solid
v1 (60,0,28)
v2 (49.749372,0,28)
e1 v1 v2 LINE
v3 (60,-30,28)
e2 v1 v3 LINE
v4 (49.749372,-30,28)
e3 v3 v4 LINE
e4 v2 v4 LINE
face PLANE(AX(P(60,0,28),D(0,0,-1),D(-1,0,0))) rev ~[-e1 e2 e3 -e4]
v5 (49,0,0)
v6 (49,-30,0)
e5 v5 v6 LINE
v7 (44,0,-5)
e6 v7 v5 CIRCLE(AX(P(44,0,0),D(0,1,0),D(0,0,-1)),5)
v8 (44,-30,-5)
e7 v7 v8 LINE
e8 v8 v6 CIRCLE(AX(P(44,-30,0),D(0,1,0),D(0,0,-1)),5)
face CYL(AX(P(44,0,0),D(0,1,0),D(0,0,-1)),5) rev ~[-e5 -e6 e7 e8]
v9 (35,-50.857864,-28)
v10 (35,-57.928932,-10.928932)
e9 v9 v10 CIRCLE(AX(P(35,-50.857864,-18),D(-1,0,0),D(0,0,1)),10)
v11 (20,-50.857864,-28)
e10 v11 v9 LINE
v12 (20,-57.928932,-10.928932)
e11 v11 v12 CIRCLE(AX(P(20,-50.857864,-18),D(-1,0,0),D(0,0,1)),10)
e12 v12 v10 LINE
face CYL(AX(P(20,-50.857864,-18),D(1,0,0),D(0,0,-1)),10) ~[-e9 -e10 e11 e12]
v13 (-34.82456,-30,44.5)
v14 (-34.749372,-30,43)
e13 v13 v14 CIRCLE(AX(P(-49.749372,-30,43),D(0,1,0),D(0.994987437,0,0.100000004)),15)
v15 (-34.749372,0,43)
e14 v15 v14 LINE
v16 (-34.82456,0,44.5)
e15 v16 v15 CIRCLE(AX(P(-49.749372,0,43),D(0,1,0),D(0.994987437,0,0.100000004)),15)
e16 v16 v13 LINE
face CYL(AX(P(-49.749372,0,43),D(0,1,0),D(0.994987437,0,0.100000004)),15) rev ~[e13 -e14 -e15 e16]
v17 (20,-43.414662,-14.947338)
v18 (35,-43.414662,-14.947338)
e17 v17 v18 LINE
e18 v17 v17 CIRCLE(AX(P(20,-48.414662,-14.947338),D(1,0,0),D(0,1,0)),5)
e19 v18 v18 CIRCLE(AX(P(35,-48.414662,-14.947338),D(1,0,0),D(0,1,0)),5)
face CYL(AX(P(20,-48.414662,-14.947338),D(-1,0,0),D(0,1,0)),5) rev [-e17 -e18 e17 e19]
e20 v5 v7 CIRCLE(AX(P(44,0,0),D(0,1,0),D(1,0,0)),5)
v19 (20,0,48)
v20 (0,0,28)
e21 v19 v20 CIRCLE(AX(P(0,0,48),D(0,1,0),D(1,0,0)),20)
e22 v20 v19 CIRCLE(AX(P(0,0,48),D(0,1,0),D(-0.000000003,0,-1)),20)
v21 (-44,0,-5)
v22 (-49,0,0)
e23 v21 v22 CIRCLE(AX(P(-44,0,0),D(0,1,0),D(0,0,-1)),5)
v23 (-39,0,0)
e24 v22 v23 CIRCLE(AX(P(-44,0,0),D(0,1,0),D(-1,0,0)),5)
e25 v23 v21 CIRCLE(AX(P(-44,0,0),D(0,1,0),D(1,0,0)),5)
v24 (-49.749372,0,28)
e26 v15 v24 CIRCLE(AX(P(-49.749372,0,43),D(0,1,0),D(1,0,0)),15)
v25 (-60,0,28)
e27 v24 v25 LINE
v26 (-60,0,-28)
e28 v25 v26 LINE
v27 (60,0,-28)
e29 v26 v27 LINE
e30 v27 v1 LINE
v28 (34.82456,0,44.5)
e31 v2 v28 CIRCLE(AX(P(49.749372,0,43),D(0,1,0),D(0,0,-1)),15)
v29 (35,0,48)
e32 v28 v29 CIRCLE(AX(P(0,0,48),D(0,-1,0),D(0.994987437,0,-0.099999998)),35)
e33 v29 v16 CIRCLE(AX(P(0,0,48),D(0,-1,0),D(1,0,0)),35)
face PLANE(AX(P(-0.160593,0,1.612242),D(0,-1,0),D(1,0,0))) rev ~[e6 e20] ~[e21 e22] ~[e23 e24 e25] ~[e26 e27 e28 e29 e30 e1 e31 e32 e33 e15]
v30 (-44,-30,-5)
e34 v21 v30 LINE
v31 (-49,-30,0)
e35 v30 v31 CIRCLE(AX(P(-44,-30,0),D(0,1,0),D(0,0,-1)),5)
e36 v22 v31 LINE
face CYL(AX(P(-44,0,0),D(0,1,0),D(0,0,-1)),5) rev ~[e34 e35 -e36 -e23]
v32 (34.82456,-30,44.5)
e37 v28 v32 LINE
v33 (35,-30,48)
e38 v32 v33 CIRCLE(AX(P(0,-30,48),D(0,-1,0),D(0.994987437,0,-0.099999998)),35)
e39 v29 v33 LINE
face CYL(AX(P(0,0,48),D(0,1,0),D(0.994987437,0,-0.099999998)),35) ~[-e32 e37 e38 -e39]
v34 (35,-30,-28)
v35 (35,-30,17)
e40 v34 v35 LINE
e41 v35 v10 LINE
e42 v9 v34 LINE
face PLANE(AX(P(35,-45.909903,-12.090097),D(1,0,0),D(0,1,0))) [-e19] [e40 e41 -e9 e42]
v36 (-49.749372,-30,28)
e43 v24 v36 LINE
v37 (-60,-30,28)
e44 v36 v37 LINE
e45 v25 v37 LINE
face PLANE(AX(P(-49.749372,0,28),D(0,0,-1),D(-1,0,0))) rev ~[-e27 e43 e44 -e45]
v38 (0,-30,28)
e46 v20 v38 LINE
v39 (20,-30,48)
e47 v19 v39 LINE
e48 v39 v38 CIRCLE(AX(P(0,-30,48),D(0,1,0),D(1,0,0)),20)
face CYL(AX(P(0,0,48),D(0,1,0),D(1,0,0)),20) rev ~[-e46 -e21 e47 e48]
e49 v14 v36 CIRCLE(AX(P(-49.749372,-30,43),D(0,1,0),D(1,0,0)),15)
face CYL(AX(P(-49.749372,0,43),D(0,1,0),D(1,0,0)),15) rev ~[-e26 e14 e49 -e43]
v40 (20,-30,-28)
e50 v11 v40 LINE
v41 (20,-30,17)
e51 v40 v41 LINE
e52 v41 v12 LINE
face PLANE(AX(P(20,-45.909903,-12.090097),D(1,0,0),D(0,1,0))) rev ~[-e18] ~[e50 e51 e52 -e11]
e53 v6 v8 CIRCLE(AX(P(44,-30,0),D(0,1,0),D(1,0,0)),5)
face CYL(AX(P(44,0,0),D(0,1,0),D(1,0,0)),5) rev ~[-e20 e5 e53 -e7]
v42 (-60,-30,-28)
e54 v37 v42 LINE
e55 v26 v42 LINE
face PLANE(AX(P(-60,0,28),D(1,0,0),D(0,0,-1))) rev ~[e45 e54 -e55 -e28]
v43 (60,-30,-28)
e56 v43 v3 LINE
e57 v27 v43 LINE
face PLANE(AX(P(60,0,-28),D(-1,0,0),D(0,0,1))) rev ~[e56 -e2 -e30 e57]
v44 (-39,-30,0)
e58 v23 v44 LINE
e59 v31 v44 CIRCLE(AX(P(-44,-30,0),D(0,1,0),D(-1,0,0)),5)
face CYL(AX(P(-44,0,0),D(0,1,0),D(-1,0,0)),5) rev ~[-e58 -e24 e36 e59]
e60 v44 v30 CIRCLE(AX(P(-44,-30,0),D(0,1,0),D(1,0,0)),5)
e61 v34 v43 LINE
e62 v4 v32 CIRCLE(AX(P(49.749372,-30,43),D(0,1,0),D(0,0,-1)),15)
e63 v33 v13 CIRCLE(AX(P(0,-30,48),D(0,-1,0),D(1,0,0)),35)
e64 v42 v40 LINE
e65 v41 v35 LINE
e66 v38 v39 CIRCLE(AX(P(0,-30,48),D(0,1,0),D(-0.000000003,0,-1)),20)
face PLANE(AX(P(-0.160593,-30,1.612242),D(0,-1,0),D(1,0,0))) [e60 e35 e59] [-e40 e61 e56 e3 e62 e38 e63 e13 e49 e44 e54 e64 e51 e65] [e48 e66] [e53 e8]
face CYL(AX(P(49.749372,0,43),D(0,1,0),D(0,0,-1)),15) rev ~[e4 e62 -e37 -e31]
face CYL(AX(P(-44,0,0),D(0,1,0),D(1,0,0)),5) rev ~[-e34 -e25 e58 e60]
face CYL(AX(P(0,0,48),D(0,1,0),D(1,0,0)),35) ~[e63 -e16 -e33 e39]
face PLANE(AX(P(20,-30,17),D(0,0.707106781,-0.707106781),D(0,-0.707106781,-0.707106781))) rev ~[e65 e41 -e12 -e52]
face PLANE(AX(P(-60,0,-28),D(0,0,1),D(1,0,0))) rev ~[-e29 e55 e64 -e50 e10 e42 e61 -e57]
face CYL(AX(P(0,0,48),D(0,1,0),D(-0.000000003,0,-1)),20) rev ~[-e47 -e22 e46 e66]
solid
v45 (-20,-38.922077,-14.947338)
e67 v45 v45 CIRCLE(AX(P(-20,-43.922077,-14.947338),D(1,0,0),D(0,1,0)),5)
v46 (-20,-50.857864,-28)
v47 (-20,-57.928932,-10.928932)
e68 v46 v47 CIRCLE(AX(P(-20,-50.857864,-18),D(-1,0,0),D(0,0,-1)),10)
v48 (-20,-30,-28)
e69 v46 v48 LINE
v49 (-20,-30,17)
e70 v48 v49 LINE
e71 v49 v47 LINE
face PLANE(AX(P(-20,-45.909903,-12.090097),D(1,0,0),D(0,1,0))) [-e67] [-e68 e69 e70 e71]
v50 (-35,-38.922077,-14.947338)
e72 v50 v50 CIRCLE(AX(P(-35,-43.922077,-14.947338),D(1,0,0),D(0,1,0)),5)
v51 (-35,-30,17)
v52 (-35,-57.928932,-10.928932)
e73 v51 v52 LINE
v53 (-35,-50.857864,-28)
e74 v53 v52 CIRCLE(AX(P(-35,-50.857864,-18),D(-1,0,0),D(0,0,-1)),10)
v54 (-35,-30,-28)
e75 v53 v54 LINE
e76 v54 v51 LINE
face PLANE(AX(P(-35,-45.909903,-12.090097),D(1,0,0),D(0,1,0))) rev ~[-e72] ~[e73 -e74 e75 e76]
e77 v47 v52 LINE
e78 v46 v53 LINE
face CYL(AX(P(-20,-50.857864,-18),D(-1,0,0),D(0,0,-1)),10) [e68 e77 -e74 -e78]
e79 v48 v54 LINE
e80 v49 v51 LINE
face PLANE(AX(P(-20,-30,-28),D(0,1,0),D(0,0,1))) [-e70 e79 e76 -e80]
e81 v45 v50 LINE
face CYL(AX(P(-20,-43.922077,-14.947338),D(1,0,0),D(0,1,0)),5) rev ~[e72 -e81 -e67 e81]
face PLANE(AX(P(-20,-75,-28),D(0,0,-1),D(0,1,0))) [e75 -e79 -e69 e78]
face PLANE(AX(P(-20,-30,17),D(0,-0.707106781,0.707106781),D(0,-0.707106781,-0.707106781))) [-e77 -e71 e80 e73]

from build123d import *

# Parameters (mm, degrees)
F1_DEPTH = 30
F3_R     = 5
F4_DEPTH = 15
F5_R     = 10
F7_R     = 5
F8_DEPTH = 15
F9_R     = 10


# Not quite as in the source:
# - a feature names something its author has since deleted; it is built from what else it names


with BuildPart() as f1:
    # F0 (on Front) → F1 (new body)
    with BuildSketch(Plane.XZ):
        with BuildLine():
            Line((60, 0), (60, 28))
            Line((60, 28), (49.7493718553, 28))
            Line((49.7493718553, 28), (28.7228132327, 28))
            ThreePointArc((28.7228132327, 28), (0, 13), (-28.7228132327, 28))
            Line((-28.7228132327, 28), (-49.7493718553, 28))
            Line((-49.7493718553, 28), (-60, 28))
            Line((-60, 28), (-60, 0))
            Line((-60, 0), (-49, 0))
            ThreePointArc((-49, 0), (-44, 5), (-39, 0))
            ThreePointArc((-39, 0), (-40.4644660941, -3.5355339059), (-44, -5))
            Line((-44, -5), (-44, -28))
            Line((-44, -28), (44, -28))
            Line((44, -28), (44, -5))
            ThreePointArc((44, -5), (40.4644660941, 3.5355339059), (49, 0))
            Line((49, 0), (60, 0))
        make_face()
        with BuildLine():
            Line((-6.45e-08, 28), (28.7228132327, 28))
            ThreePointArc((28.7228132327, 28), (32.8272702395, 35.8603818585), (34.8245603048, 44.5000000607))
            ThreePointArc((34.8245603048, 44.5000000607), (34.9561125604, 46.2478029033), (35, 48))
            ThreePointArc((35, 48), (-1.7521970967, 82.9561125604), (-34.8245603048, 44.5000000607))
            ThreePointArc((-34.8245603048, 44.5000000607), (-32.8272702395, 35.8603818585), (-28.7228132327, 28))
            Line((-28.7228132327, 28), (-6.45e-08, 28))
        make_face()
        with BuildLine():
            ThreePointArc((20, 48), (14.1421356009, 33.8578643535), (-6.45e-08, 28))
            ThreePointArc((-6.45e-08, 28), (-14.1421356009, 62.1421356465), (20, 48))
        make_face(mode=Mode.SUBTRACT)
        with BuildLine():
            ThreePointArc((-28.7228132327, 28), (0, 13), (28.7228132327, 28))
            Line((28.7228132327, 28), (-6.45e-08, 28))
            Line((-6.45e-08, 28), (-28.7228132327, 28))
        make_face()
        with BuildLine():
            Line((-49.7493718553, 28), (-28.7228132327, 28))
            ThreePointArc((-28.7228132327, 28), (-32.8272702395, 35.8603818585), (-34.8245603048, 44.5000000607))
            ThreePointArc((-34.8245603048, 44.5000000607), (-34.7681807602, 43.7509416563), (-34.7493718553, 43))
            ThreePointArc((-34.7493718553, 43), (-39.1427701375, 32.3933982822), (-49.7493718553, 28))
        make_face()
        with BuildLine():
            Line((28.7228132327, 28), (49.7493718553, 28))
            ThreePointArc((49.7493718553, 28), (38.6250741042, 32.9376941239), (34.8245603048, 44.5000000607))
            ThreePointArc((34.8245603048, 44.5000000607), (32.8272702395, 35.8603818585), (28.7228132327, 28))
        make_face()
        with BuildLine():
            Line((-60, -28), (-44, -28))
            Line((-44, -28), (-44, -5))
            ThreePointArc((-44, -5), (-47.5355339059, -3.5355339059), (-49, 0))
            Line((-49, 0), (-60, 0))
            Line((-60, 0), (-60, -28))
        make_face()
        with BuildLine():
            Line((60, -28), (60, 0))
            Line((60, 0), (49, 0))
            ThreePointArc((49, 0), (47.5355339059, -3.5355339059), (44, -5))
            Line((44, -5), (44, -28))
            Line((44, -28), (60, -28))
        make_face()
    extrude(amount=F1_DEPTH)

    # F3 (on offset) → F4 (join)
    with BuildSketch(Plane.YZ.offset(20)):
        Polygon((-75, -28), (-30, -28), (-30, 17), align=None)
        with Locations((-48.4146624804, -14.9473380297)):
            Circle(F3_R, mode=Mode.SUBTRACT)
    extrude(amount=F4_DEPTH)

    # F5
    f5_edges = [f1.edges().sort_by_distance(p)[0] for p in [
        (27.5, -75, -28),
    ]]
    fillet(f5_edges, radius=F5_R)


with BuildPart() as f8:
    # F7 (on offset) → F8 (new body)
    with BuildSketch(Plane.YZ.offset(-20)):
        Polygon((-75, -28), (-30, -28), (-30, 17), align=None)
        with Locations((-43.9220774009, -14.9473380297)):
            Circle(F7_R, mode=Mode.SUBTRACT)
    extrude(amount=-F8_DEPTH)

    # F9
    f9_edges = [f8.edges().sort_by_distance(p)[0] for p in [
        (-27.5, -75, -28),
    ]]
    fillet(f9_edges, radius=F9_R)


solid = Compound([f1.part, f8.part])
